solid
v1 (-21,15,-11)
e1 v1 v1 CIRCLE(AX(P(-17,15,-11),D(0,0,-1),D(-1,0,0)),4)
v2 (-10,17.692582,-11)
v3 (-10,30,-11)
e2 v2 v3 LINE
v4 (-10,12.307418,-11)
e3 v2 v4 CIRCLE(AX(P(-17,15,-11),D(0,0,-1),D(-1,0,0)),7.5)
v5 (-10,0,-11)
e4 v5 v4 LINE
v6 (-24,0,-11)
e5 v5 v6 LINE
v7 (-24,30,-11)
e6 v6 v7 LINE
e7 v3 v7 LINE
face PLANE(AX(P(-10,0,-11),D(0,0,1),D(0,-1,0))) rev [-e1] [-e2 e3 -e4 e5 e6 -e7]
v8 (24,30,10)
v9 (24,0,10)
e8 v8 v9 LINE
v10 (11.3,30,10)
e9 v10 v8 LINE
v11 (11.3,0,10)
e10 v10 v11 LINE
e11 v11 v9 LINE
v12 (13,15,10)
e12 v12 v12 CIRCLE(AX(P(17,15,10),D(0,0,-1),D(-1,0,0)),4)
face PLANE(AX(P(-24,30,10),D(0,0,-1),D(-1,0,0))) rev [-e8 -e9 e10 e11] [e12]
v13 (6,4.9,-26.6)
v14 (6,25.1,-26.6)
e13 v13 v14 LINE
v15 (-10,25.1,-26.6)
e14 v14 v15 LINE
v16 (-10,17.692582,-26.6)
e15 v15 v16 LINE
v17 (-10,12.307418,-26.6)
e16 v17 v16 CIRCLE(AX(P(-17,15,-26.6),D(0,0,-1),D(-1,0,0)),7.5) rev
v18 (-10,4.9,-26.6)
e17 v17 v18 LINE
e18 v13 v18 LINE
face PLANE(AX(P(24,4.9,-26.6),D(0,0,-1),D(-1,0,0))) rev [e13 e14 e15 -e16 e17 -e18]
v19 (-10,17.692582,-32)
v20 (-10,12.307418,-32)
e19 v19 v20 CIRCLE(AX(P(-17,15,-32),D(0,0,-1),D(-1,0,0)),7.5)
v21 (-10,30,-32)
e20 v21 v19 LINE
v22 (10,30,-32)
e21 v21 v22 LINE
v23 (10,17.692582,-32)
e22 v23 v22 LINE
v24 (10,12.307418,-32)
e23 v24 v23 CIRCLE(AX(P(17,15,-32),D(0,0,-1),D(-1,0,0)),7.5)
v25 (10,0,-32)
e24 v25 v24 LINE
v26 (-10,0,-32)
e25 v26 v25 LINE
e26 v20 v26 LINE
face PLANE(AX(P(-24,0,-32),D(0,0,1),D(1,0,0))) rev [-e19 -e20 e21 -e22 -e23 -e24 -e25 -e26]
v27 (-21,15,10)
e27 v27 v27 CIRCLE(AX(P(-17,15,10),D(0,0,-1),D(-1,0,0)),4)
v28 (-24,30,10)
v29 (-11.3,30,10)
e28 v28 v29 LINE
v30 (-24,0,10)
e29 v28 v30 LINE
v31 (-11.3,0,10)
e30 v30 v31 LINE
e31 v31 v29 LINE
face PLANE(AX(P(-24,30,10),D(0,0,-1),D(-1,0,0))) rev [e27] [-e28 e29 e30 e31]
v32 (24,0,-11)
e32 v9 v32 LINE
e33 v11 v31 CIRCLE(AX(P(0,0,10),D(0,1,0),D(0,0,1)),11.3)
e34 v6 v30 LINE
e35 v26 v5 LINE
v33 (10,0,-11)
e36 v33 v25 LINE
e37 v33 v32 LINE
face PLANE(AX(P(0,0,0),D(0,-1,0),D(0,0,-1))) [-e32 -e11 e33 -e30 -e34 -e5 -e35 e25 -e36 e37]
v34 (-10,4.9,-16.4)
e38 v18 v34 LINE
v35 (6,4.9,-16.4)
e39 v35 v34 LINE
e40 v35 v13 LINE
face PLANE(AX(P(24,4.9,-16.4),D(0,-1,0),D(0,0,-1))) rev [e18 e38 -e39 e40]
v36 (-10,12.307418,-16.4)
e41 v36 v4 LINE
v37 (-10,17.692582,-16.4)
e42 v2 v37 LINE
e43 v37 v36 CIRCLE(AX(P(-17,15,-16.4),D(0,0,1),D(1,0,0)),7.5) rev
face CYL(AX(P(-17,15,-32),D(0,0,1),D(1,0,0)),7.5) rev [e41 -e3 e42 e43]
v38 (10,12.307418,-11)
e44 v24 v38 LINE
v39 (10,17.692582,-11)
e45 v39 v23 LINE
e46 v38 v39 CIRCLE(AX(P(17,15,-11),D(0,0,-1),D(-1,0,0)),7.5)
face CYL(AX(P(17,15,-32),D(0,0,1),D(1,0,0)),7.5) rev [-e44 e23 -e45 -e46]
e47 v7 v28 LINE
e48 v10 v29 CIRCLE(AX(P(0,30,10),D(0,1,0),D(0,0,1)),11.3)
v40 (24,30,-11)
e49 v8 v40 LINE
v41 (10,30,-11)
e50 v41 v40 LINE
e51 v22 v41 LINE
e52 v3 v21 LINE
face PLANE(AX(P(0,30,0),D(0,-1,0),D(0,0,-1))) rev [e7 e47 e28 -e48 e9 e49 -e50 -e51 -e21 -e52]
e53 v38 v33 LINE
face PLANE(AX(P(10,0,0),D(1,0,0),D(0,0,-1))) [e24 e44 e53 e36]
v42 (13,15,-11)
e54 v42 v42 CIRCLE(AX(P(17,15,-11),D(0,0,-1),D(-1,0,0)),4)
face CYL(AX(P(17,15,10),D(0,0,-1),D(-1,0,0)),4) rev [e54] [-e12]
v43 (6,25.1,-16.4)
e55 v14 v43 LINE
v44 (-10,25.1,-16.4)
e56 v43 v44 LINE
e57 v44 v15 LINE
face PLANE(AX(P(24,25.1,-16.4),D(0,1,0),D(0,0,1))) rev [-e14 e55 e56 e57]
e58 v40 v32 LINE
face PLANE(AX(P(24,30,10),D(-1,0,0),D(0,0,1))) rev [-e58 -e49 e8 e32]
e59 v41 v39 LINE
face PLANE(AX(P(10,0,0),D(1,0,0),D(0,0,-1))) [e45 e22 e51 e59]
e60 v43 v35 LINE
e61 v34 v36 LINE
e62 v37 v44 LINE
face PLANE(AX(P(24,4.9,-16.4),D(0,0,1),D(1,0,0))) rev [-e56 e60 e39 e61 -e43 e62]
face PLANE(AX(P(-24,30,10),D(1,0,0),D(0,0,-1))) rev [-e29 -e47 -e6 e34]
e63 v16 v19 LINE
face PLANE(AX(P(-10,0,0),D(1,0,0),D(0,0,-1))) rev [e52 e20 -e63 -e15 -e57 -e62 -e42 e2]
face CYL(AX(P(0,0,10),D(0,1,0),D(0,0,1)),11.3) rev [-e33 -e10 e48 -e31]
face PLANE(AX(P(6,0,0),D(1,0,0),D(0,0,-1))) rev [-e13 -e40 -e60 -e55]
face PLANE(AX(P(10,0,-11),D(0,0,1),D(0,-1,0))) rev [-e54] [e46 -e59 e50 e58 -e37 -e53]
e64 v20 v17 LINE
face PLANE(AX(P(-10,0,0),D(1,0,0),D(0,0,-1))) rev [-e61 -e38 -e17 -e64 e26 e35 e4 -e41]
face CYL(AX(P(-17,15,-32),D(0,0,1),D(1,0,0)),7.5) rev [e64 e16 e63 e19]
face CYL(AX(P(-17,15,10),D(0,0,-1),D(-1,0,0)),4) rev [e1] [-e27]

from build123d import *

# Parameters (mm, degrees)
SKETCH_1_W          = 48
SKETCH_1_H          = 20
EXTRUDE_1_DEPTH     = 30
SKETCH_2_W          = 14
SKETCH_2_H          = 30
CUT_EXTRUDE_1_DEPTH = 7
SKETCH_7_W          = 22
SKETCH_7_H          = 30
EXTRUDE_2_DEPTH     = 48
SKETCH_8_W          = 21
SKETCH_8_H          = 30
CUT_EXTRUDE_2_DEPTH = 14
SKETCH_9_W          = 21
SKETCH_9_H          = 30
CUT_EXTRUDE_3_DEPTH = 14
SKETCH_11_W         = 10.2
SKETCH_11_H         = 20.2
CUT_EXTRUDE_4_DEPTH = 56.497747702
SKETCH_13_R         = 4
CUT_EXTRUDE_5_DEPTH = 44.783558558
SKETCH_14_R         = 4
CUT_EXTRUDE_6_DEPTH = 44.783558558
FILLET_1_R          = 7
SKETCH1_W           = 10.2
SKETCH1_H           = 20.2
BOSS_EXTRUDE1_DEPTH = 4
SKETCH_20_R         = 7.5
CUT_EXTRUDE_8_DEPTH = 44.783558558
SKETCH2_R           = 11.3
CUT_EXTRUDE1_DEPTH  = 51


with BuildPart() as part:
    # Эскиз1 → Бобышка-Вытянуть1 (new body)
    with BuildSketch(Plane(origin=(0, 0, 0), x_dir=(1, 0, 0), z_dir=(0, 1, 0))):
        Rectangle(SKETCH_1_W, SKETCH_1_H)
    extrude(amount=EXTRUDE_1_DEPTH)

    # Эскиз2 → Вырез-Вытянуть1 (cut)
    with BuildSketch(Plane.XY.offset(10)):
        with Locations((0, 15)):
            Rectangle(SKETCH_2_W, SKETCH_2_H)
    extrude(amount=-CUT_EXTRUDE_1_DEPTH, mode=Mode.SUBTRACT)

    # Эскиз7 → Бобышка-Вытянуть2 (add)
    with BuildSketch(Plane(origin=(24, 0, 0), x_dir=(0, 0, -1), z_dir=(1, 0, 0))):
        with Locations((21, 15)):
            Rectangle(SKETCH_7_W, SKETCH_7_H)
    extrude(amount=-EXTRUDE_2_DEPTH)

    # Эскиз8 → Вырез-Вытянуть2 (cut)
    with BuildSketch(Plane(origin=(24, 0, 0), x_dir=(0, 0, -1), z_dir=(1, 0, 0))):
        with Locations((21.5, 15)):
            Rectangle(SKETCH_8_W, SKETCH_8_H)
    extrude(amount=-CUT_EXTRUDE_2_DEPTH, mode=Mode.SUBTRACT)

    # Эскиз9 → Вырез-Вытянуть3 (cut)
    with BuildSketch(Plane.ZY.offset(24)):
        with Locations((-21.5, 15)):
            Rectangle(SKETCH_9_W, SKETCH_9_H)
    extrude(amount=-CUT_EXTRUDE_3_DEPTH, mode=Mode.SUBTRACT)

    # Эскиз11 → Вырез-Вытянуть4 (cut, through all)
    with BuildSketch(Plane.ZY.offset(10)):
        with Locations((-21.5, 15)):
            Rectangle(SKETCH_11_W, SKETCH_11_H)
    extrude(amount=-CUT_EXTRUDE_4_DEPTH, mode=Mode.SUBTRACT)

    # Эскиз13 → Вырез-Вытянуть5 (cut, through all)
    with BuildSketch(Plane(origin=(0, 0, -11), x_dir=(-1, 0, 0), z_dir=(0, 0, -1))):
        with Locations((17, 15)):
            Circle(SKETCH_13_R)
    extrude(amount=-CUT_EXTRUDE_5_DEPTH, mode=Mode.SUBTRACT)

    # Эскиз14 → Вырез-Вытянуть6 (cut, through all)
    with BuildSketch(Plane(origin=(0, 0, -11), x_dir=(-1, 0, 0), z_dir=(0, 0, -1))):
        with Locations((-17, 15)):
            Circle(SKETCH_14_R)
    extrude(amount=-CUT_EXTRUDE_6_DEPTH, mode=Mode.SUBTRACT)

    # Скругление1
    fillet_1_edges = [part.edges().sort_by_distance(p)[0] for p in [
        (-7, 15, 3),
        (7, 15, 3),
    ]]
    fillet(fillet_1_edges, radius=FILLET_1_R - 0.0001)  # a hair under: the kernel refuses the full size

    # Sketch1 → Boss-Extrude1 (add)
    with BuildSketch(Plane(origin=(10, 0, 0), x_dir=(0, 0, -1), z_dir=(1, 0, 0))):
        with Locations((21.5, 15)):
            Rectangle(SKETCH1_W, SKETCH1_H)
    extrude(amount=-BOSS_EXTRUDE1_DEPTH)

    # Эскиз20 → Вырез-Вытянуть8 (cut, through all)
    with BuildSketch(Plane(origin=(0, 0, -11), x_dir=(-1, 0, 0), z_dir=(0, 0, -1))):
        with Locations((-17, 15)):
            Circle(SKETCH_20_R)
        with Locations((17, 15)):
            Circle(SKETCH_20_R)
    extrude(amount=CUT_EXTRUDE_8_DEPTH, mode=Mode.SUBTRACT)

    # Sketch2 → Cut-Extrude1 (cut, through all)
    with BuildSketch(Plane(origin=(0, 30, 0), x_dir=(1, 0, 0), z_dir=(0, 1, 0))):
        with Locations((0, -10)):
            Circle(SKETCH2_R)
    extrude(amount=-CUT_EXTRUDE1_DEPTH, mode=Mode.SUBTRACT)


solid = part.part
